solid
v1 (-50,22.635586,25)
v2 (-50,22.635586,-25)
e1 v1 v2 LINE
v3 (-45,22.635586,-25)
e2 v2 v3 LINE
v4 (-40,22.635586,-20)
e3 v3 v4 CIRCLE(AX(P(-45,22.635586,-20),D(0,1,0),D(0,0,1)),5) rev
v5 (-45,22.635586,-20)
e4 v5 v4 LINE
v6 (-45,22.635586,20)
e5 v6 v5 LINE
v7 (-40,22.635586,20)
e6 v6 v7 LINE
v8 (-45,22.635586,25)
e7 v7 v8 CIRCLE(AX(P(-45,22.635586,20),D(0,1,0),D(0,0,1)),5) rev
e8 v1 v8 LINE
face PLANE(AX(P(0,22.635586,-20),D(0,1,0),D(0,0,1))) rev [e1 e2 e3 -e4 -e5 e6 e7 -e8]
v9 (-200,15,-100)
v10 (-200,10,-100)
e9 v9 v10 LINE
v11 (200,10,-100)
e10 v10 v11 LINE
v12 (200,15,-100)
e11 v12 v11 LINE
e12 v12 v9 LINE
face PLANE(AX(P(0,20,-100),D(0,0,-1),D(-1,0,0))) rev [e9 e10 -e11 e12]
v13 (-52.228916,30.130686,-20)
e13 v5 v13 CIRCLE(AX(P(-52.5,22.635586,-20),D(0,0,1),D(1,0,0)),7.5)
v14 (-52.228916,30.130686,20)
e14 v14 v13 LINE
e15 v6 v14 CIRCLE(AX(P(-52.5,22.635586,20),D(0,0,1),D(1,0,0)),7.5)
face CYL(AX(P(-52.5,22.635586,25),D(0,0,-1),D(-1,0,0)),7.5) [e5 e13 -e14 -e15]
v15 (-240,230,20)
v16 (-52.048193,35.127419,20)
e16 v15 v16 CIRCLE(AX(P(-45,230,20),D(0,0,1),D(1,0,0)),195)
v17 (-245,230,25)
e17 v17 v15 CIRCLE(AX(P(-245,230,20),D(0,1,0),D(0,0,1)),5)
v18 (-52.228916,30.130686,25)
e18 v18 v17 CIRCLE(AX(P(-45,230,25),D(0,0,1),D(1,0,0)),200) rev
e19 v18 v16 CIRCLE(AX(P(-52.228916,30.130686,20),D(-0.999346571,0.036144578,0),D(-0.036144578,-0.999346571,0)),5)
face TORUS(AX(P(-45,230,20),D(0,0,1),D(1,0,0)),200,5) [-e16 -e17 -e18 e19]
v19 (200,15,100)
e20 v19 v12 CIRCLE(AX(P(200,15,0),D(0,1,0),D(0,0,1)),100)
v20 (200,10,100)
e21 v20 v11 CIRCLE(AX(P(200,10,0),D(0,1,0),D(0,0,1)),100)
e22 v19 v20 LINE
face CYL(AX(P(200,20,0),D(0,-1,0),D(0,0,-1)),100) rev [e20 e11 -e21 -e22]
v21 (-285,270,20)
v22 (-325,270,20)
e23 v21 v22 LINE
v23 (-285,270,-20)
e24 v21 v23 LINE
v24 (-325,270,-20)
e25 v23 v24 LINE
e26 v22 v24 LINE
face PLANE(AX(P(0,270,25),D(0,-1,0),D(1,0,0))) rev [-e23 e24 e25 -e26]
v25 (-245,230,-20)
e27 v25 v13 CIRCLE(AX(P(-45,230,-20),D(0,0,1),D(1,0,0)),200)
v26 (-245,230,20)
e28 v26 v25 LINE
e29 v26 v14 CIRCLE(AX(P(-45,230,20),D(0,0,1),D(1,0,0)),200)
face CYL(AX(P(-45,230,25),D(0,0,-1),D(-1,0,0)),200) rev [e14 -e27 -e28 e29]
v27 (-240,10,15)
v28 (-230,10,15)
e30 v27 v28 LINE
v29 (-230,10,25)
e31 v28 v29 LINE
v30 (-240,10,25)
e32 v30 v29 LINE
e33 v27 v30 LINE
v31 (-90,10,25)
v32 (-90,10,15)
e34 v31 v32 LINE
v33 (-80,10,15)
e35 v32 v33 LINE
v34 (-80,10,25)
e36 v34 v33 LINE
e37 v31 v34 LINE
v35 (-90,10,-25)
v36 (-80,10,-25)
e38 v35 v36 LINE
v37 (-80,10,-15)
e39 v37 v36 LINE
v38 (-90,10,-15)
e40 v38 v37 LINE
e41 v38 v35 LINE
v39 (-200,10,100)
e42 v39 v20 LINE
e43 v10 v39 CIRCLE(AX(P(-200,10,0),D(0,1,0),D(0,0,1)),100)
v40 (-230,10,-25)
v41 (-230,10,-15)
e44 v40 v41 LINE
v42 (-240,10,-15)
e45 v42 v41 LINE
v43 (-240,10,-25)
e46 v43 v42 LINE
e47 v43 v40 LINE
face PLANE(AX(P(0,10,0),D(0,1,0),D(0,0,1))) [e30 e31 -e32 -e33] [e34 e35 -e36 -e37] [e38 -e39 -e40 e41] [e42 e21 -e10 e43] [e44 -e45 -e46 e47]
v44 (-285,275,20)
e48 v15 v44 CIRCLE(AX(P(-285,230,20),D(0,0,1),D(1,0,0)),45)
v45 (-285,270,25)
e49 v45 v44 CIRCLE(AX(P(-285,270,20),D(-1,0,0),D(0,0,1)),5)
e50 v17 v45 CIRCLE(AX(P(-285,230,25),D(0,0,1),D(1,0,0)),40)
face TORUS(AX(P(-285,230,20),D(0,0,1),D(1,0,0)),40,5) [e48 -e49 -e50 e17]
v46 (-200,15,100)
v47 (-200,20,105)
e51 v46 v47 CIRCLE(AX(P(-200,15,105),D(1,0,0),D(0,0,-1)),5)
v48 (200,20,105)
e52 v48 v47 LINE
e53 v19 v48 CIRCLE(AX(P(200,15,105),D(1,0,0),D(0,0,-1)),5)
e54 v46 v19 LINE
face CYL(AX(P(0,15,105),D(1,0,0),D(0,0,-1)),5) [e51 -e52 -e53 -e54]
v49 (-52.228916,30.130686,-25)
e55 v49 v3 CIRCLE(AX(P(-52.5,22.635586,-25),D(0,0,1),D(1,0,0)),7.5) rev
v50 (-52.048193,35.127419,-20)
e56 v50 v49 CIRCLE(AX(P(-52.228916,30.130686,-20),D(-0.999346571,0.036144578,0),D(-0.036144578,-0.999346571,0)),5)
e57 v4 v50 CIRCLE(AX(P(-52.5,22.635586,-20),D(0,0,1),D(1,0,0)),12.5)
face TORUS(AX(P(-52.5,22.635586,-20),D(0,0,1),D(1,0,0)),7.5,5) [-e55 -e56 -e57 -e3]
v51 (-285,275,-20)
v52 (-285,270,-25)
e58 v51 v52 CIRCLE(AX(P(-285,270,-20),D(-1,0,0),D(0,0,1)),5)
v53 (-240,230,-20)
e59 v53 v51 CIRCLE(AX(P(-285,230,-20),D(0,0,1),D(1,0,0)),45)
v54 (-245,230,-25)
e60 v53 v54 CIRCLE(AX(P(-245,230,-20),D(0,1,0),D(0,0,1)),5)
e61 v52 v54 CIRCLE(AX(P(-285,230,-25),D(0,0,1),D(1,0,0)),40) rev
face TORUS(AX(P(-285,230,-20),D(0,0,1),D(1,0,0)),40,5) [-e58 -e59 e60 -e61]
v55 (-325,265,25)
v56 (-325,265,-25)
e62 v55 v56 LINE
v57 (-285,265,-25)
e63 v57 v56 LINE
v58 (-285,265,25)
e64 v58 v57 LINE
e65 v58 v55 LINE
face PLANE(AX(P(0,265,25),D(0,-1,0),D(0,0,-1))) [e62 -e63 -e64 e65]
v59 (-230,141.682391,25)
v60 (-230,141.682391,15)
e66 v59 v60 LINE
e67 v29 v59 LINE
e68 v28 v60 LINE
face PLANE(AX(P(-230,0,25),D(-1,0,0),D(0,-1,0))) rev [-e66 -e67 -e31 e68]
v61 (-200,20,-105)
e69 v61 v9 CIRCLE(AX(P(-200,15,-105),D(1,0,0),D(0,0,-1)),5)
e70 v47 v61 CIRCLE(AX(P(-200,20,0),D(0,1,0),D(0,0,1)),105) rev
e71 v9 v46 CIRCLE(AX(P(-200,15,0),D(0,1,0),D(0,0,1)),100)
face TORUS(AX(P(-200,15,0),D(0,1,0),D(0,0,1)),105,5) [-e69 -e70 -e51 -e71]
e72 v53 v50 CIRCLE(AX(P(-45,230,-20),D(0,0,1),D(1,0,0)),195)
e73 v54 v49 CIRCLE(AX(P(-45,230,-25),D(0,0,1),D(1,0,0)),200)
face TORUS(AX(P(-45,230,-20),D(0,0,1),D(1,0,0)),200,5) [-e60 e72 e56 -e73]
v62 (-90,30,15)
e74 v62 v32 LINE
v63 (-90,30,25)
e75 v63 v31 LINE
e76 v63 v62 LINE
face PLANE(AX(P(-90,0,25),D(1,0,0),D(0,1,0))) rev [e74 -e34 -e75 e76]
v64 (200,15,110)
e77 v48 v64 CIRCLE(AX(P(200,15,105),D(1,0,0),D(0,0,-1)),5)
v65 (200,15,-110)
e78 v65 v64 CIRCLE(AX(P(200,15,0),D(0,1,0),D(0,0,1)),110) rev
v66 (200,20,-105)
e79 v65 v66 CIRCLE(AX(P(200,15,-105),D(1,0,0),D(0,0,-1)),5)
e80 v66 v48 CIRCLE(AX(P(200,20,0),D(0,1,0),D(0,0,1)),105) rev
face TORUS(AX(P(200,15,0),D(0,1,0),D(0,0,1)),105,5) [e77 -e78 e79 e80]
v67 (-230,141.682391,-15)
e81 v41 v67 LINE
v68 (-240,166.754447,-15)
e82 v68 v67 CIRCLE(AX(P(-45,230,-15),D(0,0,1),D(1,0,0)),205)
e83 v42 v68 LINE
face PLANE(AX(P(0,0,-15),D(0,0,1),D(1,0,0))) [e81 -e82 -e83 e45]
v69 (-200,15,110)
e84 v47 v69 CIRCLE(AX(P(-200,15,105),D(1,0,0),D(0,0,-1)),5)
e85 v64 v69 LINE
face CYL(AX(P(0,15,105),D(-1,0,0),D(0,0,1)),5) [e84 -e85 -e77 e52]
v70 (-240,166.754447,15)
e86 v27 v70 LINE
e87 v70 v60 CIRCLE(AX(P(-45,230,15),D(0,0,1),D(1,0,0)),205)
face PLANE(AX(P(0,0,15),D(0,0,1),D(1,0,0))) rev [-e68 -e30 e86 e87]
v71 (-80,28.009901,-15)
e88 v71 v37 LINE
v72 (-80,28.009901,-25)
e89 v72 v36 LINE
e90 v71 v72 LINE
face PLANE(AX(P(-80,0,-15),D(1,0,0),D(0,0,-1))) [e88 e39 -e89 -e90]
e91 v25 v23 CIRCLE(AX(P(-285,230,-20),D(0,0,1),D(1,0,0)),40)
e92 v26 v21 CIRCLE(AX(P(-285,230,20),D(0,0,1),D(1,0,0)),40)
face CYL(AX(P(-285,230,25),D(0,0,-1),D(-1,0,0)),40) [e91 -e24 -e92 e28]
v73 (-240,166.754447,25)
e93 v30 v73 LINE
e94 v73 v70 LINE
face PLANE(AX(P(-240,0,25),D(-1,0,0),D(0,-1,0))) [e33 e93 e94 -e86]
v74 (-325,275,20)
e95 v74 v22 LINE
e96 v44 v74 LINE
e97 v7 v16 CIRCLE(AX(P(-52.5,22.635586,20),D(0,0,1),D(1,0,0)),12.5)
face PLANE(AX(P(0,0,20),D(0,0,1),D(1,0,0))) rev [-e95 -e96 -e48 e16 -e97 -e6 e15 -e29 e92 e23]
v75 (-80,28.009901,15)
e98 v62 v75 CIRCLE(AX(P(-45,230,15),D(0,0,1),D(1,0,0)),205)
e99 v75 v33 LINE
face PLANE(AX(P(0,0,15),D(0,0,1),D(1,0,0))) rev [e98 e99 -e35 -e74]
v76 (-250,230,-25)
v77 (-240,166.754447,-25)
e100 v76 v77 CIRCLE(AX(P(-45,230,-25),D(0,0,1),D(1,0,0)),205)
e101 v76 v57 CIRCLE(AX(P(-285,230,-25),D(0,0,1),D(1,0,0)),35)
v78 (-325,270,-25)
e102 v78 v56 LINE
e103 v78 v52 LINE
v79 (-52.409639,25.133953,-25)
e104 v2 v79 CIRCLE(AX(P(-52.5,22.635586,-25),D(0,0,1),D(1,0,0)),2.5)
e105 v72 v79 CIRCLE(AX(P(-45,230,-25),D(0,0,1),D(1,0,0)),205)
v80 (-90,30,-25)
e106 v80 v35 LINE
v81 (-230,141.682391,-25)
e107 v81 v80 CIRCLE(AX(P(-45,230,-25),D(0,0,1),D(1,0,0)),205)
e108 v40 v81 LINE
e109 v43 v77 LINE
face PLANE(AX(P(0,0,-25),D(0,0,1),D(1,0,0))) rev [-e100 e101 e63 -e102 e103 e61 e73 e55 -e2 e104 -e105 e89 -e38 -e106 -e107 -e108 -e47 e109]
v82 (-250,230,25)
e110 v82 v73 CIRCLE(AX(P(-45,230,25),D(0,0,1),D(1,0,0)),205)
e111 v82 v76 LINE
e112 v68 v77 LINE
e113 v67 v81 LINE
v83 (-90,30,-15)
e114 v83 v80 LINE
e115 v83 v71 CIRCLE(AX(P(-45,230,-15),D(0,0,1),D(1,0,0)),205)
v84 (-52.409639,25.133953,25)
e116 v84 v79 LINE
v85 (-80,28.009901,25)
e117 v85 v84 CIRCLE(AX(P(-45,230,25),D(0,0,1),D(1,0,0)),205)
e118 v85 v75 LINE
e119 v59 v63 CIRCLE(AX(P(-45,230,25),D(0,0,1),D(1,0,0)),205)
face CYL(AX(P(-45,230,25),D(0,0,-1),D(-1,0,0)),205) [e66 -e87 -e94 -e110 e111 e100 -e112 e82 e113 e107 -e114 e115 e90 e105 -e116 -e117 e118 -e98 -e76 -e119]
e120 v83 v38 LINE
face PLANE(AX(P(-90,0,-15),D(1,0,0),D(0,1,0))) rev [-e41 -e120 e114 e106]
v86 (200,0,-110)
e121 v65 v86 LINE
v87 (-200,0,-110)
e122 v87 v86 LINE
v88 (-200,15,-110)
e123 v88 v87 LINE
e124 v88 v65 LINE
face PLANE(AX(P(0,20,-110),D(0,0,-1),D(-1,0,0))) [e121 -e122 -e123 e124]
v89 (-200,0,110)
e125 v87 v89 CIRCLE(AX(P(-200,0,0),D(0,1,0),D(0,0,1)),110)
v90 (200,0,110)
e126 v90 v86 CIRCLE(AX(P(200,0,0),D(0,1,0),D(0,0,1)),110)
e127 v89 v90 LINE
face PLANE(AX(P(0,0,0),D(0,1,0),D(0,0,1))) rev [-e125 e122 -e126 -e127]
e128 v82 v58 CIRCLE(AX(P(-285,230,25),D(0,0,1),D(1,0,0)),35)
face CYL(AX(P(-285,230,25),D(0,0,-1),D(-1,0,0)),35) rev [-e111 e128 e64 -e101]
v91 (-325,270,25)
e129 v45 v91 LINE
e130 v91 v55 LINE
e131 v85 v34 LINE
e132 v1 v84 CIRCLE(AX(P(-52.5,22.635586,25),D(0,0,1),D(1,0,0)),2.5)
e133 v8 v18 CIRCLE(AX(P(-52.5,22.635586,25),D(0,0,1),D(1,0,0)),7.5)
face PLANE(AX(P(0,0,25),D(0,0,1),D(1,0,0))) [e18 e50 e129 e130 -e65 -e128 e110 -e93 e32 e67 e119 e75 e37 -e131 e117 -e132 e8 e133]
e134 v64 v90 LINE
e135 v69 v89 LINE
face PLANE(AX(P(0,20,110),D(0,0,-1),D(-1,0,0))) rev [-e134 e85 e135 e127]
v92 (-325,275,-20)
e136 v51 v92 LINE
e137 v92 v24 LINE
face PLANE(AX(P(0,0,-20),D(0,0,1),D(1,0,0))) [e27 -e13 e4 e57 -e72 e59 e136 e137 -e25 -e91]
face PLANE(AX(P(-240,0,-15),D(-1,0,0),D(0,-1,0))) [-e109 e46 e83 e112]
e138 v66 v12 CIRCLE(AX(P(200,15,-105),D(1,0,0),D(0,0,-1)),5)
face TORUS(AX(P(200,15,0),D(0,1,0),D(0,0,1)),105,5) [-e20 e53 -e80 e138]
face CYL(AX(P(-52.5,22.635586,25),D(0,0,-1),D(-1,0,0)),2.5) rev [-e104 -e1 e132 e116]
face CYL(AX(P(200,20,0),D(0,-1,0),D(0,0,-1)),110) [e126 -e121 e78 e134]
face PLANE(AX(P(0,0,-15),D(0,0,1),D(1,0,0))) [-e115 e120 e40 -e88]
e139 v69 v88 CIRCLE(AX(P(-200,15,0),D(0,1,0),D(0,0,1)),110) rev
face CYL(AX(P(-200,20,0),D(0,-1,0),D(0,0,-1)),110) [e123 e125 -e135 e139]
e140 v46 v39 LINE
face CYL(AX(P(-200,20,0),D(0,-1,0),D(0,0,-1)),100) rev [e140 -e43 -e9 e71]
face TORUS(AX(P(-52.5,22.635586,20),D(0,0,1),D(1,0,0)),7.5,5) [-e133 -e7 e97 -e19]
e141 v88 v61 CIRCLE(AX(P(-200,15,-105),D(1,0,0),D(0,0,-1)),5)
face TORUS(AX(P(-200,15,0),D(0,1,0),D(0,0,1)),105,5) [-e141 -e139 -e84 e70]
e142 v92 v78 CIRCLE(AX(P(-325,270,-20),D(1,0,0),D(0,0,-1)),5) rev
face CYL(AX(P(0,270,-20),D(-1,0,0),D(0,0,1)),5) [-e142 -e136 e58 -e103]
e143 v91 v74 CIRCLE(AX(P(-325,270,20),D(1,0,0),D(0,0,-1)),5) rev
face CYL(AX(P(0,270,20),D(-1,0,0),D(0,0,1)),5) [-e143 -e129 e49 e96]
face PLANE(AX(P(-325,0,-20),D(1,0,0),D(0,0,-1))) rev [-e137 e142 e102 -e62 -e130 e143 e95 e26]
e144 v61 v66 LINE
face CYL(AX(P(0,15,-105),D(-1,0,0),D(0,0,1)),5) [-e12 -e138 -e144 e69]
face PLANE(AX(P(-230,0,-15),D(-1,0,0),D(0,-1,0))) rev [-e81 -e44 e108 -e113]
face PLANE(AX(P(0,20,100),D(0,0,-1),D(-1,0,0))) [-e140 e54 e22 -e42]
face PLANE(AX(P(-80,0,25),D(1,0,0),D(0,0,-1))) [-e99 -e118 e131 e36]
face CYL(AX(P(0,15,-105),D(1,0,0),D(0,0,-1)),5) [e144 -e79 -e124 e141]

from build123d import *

# Parameters (mm, degrees)
SKETCH_1_W      = 4
SKETCH_1_H      = 6
EXTRUDE_1_DEPTH = 10
EXTRUDE_2_DEPTH = 20
SKETCH_1_4_W    = 4
SKETCH_1_4_H    = 6
EXTRUDE_3_DEPTH = 10
FILLET_1_R      = 5
EXTRUDE_4_DEPTH = 25
EXTRUDE_START   = 25
EXTRUDE_5_DEPTH = 5
EXTRUDE_START_2 = -25
EXTRUDE_6_DEPTH = 5
EXTRUDE_START_3 = 15
EXTRUDE_7_DEPTH = 10
EXTRUDE_8_DEPTH = 10
FILLET_2_R      = 5


with BuildPart() as part:
    # Эскиз1 → Бобышка-Вытянуть1 (new body)
    with BuildSketch(Plane(origin=(0, 0, 0), x_dir=(1, 0, 0), z_dir=(0, 1, 0))):
        with BuildLine():
            Line((-200, -100), (200, -100))
            ThreePointArc((200, -100), (300, 0), (200, 100))
            Line((200, 100), (-200, 100))
            ThreePointArc((-200, 100), (-300, 0), (-200, -100))
        make_face()
        with Locations((-242, 18)):
            Rectangle(SKETCH_1_W, SKETCH_1_H, mode=Mode.SUBTRACT)
        with Locations((-242, -18)):
            Rectangle(SKETCH_1_W, SKETCH_1_H, mode=Mode.SUBTRACT)
    extrude(amount=EXTRUDE_1_DEPTH)

    # Эскиз1<3> → Бобышка-Вытянуть2 (add)
    with BuildSketch(Plane(origin=(0, 0, 0), x_dir=(1, 0, 0), z_dir=(0, 1, 0))):
        with BuildLine():
            Line((-200, 110), (200, 110))
            ThreePointArc((200, 110), (310, 0), (200, -110))
            Line((200, -110), (-200, -110))
            ThreePointArc((-200, -110), (-310, 0), (-200, 110))
        make_face()
        with BuildLine():
            ThreePointArc((200, -100), (300, 0), (200, 100))
            Line((200, 100), (-200, 100))
            ThreePointArc((-200, 100), (-300, 0), (-200, -100))
            Line((-200, -100), (200, -100))
        make_face(mode=Mode.SUBTRACT)
    extrude(amount=EXTRUDE_2_DEPTH)

    # Эскиз1<4> → Бобышка-Вытянуть3 (add)
    with BuildSketch(Plane(origin=(0, 0, 0), x_dir=(1, 0, 0), z_dir=(0, 1, 0))):
        with Locations((-242, 18)):
            Rectangle(SKETCH_1_4_W, SKETCH_1_4_H)
        with Locations((-242, -18)):
            Rectangle(SKETCH_1_4_W, SKETCH_1_4_H)
    extrude(amount=EXTRUDE_3_DEPTH)

    # Скругление1
    fillet_1_edges = [part.edges().sort_by_distance(p)[0] for p in [
        (0, 20, -110),
        (300, 20, 0),
        (0, 20, 100),
        (-300, 20, 0),
        (0, 20, -100),
        (-310, 20, 0),
        (0, 20, 110),
        (310, 20, 0),
    ]]
    fillet(fillet_1_edges, radius=FILLET_1_R - 0.0001)  # a hair under: the kernel refuses the full size



with BuildPart() as body_2:
    # Эскиз2 → Бобышка-Вытянуть4 (new, symmetric)
    with BuildSketch(Plane.XY):
        with BuildLine():
            ThreePointArc((-245, 230), (-256.715728753, 258.284271247), (-285, 270))
            Line((-285, 270), (-325, 270))
            Line((-325, 270), (-325, 265))
            Line((-325, 265), (-285, 265))
            ThreePointArc((-285, 265), (-260.251262658, 254.748737342), (-250, 230))
            ThreePointArc((-250, 230), (-247.484567313, 197.984378813), (-240, 166.754446797))
            ThreePointArc((-240, 166.754446797), (-235.413108769, 154.053650458), (-230, 141.682391337))
            ThreePointArc((-230, 141.682391337), (-172.840678712, 69.744700973), (-90, 30))
            ThreePointArc((-90, 30), (-85.012374627, 28.942769648), (-80, 28.009901233))
            ThreePointArc((-80, 28.009901233), (-66.253520421, 26.104713469), (-52.409638554, 25.133952895))
            ThreePointArc((-52.409638554, 25.133952895), (-50.700569032, 24.371111803), (-50, 22.635586467))
            Line((-50, 22.635586467), (-45, 22.635586467))
            ThreePointArc((-45, 22.635586467), (-47.101707097, 27.842162475), (-52.228915663, 30.130685751))
            ThreePointArc((-52.228915663, 30.130685751), (-188.95447741, 91.1579731), (-245, 230))
        make_face()
    extrude(amount=EXTRUDE_4_DEPTH, both=True)


with BuildPart() as body_3:
    # Эскиз2<4> → Бобышка-Вытянуть5 (new body)
    with BuildSketch(Plane.XY.offset(EXTRUDE_START)):
        with BuildLine():
            Line((-325, 270), (-285, 270))
            ThreePointArc((-285, 270), (-256.715728753, 258.284271247), (-245, 230))
            ThreePointArc((-245, 230), (-188.95447741, 91.1579731), (-52.228915663, 30.130685751))
            ThreePointArc((-52.228915663, 30.130685751), (-47.101707097, 27.842162475), (-45, 22.635586467))
            Line((-45, 22.635586467), (-40, 22.635586467))
            ThreePointArc((-40, 22.635586467), (-43.502845162, 31.313213148), (-52.048192771, 35.127418607))
            ThreePointArc((-52.048192771, 35.127418607), (-185.355615474, 94.629023772), (-240, 230))
            ThreePointArc((-240, 230), (-253.180194847, 261.819805153), (-285, 275))
            Line((-285, 275), (-325, 275))
            Line((-325, 275), (-325, 270))
        make_face()
    extrude(amount=-EXTRUDE_5_DEPTH)


with BuildPart() as body_4:
    # Эскиз2<5> → Бобышка-Вытянуть6 (new body)
    with BuildSketch(Plane.XY.offset(EXTRUDE_START_2)):
        with BuildLine():
            Line((-325, 270), (-285, 270))
            ThreePointArc((-285, 270), (-256.715728753, 258.284271247), (-245, 230))
            ThreePointArc((-245, 230), (-188.95447741, 91.1579731), (-52.228915663, 30.130685751))
            ThreePointArc((-52.228915663, 30.130685751), (-47.101707097, 27.842162475), (-45, 22.635586467))
            Line((-45, 22.635586467), (-40, 22.635586467))
            ThreePointArc((-40, 22.635586467), (-43.502845162, 31.313213148), (-52.048192771, 35.127418607))
            ThreePointArc((-52.048192771, 35.127418607), (-185.355615474, 94.629023772), (-240, 230))
            ThreePointArc((-240, 230), (-253.180194847, 261.819805153), (-285, 275))
            Line((-285, 275), (-325, 275))
            Line((-325, 275), (-325, 270))
        make_face()
    extrude(amount=EXTRUDE_6_DEPTH)



with BuildPart() as part_1:
    add(part.part)

    add(body_2.part)  # Бобышка-Вытянуть7 merges body 2

    add(body_3.part)  # Бобышка-Вытянуть7 merges body 3
    # Эскиз2<8> → Бобышка-Вытянуть7 (add)
    with BuildSketch(Plane.XY.offset(EXTRUDE_START_3)):
        with BuildLine():
            ThreePointArc((-230, 141.682391337), (-235.413108769, 154.053650458), (-240, 166.754446797))
            Line((-240, 166.754446797), (-240, 0))
            Line((-240, 0), (-230, 0))
            Line((-230, 0), (-230, 141.682391337))
        make_face()
        with BuildLine():
            Line((-80, 0), (-80, 28.009901233))
            ThreePointArc((-80, 28.009901233), (-85.012374627, 28.942769648), (-90, 30))
            Line((-90, 30), (-90, 0))
            Line((-90, 0), (-80, 0))
        make_face()
    extrude(amount=EXTRUDE_7_DEPTH)


with BuildPart() as body_4_1:
    add(body_4.part)

    add(part_1.part)  # Бобышка-Вытянуть8 merges part
    # Эскиз2<9> → Бобышка-Вытянуть8 (add)
    with BuildSketch(Plane.XY.offset(EXTRUDE_START_2)):
        with BuildLine():
            ThreePointArc((-230, 141.682391337), (-235.413108769, 154.053650458), (-240, 166.754446797))
            Line((-240, 166.754446797), (-240, 0))
            Line((-240, 0), (-230, 0))
            Line((-230, 0), (-230, 141.682391337))
        make_face()
        with BuildLine():
            Line((-80, 0), (-80, 28.009901233))
            ThreePointArc((-80, 28.009901233), (-85.012374627, 28.942769648), (-90, 30))
            Line((-90, 30), (-90, 0))
            Line((-90, 0), (-80, 0))
        make_face()
    extrude(amount=EXTRUDE_8_DEPTH)

    # Скругление2
    fillet_2_edges = [body_4_1.edges().sort_by_distance(p)[0] for p in [
        (-305, 275, -25),
        (-253.180194847, 261.819805153, -25),
        (-43.502845162, 31.313213148, -25),
        (-305, 275, 25),
        (-253.180194847, 261.819805153, 25),
        (-43.502845162, 31.313213148, 25),
        (-185.355615474, 94.629023772, -25),
        (-185.355615474, 94.629023772, 25),
    ]]
    fillet(fillet_2_edges, radius=FILLET_2_R - 0.0001)  # a hair under: the kernel refuses the full size


solid = body_4_1.part
